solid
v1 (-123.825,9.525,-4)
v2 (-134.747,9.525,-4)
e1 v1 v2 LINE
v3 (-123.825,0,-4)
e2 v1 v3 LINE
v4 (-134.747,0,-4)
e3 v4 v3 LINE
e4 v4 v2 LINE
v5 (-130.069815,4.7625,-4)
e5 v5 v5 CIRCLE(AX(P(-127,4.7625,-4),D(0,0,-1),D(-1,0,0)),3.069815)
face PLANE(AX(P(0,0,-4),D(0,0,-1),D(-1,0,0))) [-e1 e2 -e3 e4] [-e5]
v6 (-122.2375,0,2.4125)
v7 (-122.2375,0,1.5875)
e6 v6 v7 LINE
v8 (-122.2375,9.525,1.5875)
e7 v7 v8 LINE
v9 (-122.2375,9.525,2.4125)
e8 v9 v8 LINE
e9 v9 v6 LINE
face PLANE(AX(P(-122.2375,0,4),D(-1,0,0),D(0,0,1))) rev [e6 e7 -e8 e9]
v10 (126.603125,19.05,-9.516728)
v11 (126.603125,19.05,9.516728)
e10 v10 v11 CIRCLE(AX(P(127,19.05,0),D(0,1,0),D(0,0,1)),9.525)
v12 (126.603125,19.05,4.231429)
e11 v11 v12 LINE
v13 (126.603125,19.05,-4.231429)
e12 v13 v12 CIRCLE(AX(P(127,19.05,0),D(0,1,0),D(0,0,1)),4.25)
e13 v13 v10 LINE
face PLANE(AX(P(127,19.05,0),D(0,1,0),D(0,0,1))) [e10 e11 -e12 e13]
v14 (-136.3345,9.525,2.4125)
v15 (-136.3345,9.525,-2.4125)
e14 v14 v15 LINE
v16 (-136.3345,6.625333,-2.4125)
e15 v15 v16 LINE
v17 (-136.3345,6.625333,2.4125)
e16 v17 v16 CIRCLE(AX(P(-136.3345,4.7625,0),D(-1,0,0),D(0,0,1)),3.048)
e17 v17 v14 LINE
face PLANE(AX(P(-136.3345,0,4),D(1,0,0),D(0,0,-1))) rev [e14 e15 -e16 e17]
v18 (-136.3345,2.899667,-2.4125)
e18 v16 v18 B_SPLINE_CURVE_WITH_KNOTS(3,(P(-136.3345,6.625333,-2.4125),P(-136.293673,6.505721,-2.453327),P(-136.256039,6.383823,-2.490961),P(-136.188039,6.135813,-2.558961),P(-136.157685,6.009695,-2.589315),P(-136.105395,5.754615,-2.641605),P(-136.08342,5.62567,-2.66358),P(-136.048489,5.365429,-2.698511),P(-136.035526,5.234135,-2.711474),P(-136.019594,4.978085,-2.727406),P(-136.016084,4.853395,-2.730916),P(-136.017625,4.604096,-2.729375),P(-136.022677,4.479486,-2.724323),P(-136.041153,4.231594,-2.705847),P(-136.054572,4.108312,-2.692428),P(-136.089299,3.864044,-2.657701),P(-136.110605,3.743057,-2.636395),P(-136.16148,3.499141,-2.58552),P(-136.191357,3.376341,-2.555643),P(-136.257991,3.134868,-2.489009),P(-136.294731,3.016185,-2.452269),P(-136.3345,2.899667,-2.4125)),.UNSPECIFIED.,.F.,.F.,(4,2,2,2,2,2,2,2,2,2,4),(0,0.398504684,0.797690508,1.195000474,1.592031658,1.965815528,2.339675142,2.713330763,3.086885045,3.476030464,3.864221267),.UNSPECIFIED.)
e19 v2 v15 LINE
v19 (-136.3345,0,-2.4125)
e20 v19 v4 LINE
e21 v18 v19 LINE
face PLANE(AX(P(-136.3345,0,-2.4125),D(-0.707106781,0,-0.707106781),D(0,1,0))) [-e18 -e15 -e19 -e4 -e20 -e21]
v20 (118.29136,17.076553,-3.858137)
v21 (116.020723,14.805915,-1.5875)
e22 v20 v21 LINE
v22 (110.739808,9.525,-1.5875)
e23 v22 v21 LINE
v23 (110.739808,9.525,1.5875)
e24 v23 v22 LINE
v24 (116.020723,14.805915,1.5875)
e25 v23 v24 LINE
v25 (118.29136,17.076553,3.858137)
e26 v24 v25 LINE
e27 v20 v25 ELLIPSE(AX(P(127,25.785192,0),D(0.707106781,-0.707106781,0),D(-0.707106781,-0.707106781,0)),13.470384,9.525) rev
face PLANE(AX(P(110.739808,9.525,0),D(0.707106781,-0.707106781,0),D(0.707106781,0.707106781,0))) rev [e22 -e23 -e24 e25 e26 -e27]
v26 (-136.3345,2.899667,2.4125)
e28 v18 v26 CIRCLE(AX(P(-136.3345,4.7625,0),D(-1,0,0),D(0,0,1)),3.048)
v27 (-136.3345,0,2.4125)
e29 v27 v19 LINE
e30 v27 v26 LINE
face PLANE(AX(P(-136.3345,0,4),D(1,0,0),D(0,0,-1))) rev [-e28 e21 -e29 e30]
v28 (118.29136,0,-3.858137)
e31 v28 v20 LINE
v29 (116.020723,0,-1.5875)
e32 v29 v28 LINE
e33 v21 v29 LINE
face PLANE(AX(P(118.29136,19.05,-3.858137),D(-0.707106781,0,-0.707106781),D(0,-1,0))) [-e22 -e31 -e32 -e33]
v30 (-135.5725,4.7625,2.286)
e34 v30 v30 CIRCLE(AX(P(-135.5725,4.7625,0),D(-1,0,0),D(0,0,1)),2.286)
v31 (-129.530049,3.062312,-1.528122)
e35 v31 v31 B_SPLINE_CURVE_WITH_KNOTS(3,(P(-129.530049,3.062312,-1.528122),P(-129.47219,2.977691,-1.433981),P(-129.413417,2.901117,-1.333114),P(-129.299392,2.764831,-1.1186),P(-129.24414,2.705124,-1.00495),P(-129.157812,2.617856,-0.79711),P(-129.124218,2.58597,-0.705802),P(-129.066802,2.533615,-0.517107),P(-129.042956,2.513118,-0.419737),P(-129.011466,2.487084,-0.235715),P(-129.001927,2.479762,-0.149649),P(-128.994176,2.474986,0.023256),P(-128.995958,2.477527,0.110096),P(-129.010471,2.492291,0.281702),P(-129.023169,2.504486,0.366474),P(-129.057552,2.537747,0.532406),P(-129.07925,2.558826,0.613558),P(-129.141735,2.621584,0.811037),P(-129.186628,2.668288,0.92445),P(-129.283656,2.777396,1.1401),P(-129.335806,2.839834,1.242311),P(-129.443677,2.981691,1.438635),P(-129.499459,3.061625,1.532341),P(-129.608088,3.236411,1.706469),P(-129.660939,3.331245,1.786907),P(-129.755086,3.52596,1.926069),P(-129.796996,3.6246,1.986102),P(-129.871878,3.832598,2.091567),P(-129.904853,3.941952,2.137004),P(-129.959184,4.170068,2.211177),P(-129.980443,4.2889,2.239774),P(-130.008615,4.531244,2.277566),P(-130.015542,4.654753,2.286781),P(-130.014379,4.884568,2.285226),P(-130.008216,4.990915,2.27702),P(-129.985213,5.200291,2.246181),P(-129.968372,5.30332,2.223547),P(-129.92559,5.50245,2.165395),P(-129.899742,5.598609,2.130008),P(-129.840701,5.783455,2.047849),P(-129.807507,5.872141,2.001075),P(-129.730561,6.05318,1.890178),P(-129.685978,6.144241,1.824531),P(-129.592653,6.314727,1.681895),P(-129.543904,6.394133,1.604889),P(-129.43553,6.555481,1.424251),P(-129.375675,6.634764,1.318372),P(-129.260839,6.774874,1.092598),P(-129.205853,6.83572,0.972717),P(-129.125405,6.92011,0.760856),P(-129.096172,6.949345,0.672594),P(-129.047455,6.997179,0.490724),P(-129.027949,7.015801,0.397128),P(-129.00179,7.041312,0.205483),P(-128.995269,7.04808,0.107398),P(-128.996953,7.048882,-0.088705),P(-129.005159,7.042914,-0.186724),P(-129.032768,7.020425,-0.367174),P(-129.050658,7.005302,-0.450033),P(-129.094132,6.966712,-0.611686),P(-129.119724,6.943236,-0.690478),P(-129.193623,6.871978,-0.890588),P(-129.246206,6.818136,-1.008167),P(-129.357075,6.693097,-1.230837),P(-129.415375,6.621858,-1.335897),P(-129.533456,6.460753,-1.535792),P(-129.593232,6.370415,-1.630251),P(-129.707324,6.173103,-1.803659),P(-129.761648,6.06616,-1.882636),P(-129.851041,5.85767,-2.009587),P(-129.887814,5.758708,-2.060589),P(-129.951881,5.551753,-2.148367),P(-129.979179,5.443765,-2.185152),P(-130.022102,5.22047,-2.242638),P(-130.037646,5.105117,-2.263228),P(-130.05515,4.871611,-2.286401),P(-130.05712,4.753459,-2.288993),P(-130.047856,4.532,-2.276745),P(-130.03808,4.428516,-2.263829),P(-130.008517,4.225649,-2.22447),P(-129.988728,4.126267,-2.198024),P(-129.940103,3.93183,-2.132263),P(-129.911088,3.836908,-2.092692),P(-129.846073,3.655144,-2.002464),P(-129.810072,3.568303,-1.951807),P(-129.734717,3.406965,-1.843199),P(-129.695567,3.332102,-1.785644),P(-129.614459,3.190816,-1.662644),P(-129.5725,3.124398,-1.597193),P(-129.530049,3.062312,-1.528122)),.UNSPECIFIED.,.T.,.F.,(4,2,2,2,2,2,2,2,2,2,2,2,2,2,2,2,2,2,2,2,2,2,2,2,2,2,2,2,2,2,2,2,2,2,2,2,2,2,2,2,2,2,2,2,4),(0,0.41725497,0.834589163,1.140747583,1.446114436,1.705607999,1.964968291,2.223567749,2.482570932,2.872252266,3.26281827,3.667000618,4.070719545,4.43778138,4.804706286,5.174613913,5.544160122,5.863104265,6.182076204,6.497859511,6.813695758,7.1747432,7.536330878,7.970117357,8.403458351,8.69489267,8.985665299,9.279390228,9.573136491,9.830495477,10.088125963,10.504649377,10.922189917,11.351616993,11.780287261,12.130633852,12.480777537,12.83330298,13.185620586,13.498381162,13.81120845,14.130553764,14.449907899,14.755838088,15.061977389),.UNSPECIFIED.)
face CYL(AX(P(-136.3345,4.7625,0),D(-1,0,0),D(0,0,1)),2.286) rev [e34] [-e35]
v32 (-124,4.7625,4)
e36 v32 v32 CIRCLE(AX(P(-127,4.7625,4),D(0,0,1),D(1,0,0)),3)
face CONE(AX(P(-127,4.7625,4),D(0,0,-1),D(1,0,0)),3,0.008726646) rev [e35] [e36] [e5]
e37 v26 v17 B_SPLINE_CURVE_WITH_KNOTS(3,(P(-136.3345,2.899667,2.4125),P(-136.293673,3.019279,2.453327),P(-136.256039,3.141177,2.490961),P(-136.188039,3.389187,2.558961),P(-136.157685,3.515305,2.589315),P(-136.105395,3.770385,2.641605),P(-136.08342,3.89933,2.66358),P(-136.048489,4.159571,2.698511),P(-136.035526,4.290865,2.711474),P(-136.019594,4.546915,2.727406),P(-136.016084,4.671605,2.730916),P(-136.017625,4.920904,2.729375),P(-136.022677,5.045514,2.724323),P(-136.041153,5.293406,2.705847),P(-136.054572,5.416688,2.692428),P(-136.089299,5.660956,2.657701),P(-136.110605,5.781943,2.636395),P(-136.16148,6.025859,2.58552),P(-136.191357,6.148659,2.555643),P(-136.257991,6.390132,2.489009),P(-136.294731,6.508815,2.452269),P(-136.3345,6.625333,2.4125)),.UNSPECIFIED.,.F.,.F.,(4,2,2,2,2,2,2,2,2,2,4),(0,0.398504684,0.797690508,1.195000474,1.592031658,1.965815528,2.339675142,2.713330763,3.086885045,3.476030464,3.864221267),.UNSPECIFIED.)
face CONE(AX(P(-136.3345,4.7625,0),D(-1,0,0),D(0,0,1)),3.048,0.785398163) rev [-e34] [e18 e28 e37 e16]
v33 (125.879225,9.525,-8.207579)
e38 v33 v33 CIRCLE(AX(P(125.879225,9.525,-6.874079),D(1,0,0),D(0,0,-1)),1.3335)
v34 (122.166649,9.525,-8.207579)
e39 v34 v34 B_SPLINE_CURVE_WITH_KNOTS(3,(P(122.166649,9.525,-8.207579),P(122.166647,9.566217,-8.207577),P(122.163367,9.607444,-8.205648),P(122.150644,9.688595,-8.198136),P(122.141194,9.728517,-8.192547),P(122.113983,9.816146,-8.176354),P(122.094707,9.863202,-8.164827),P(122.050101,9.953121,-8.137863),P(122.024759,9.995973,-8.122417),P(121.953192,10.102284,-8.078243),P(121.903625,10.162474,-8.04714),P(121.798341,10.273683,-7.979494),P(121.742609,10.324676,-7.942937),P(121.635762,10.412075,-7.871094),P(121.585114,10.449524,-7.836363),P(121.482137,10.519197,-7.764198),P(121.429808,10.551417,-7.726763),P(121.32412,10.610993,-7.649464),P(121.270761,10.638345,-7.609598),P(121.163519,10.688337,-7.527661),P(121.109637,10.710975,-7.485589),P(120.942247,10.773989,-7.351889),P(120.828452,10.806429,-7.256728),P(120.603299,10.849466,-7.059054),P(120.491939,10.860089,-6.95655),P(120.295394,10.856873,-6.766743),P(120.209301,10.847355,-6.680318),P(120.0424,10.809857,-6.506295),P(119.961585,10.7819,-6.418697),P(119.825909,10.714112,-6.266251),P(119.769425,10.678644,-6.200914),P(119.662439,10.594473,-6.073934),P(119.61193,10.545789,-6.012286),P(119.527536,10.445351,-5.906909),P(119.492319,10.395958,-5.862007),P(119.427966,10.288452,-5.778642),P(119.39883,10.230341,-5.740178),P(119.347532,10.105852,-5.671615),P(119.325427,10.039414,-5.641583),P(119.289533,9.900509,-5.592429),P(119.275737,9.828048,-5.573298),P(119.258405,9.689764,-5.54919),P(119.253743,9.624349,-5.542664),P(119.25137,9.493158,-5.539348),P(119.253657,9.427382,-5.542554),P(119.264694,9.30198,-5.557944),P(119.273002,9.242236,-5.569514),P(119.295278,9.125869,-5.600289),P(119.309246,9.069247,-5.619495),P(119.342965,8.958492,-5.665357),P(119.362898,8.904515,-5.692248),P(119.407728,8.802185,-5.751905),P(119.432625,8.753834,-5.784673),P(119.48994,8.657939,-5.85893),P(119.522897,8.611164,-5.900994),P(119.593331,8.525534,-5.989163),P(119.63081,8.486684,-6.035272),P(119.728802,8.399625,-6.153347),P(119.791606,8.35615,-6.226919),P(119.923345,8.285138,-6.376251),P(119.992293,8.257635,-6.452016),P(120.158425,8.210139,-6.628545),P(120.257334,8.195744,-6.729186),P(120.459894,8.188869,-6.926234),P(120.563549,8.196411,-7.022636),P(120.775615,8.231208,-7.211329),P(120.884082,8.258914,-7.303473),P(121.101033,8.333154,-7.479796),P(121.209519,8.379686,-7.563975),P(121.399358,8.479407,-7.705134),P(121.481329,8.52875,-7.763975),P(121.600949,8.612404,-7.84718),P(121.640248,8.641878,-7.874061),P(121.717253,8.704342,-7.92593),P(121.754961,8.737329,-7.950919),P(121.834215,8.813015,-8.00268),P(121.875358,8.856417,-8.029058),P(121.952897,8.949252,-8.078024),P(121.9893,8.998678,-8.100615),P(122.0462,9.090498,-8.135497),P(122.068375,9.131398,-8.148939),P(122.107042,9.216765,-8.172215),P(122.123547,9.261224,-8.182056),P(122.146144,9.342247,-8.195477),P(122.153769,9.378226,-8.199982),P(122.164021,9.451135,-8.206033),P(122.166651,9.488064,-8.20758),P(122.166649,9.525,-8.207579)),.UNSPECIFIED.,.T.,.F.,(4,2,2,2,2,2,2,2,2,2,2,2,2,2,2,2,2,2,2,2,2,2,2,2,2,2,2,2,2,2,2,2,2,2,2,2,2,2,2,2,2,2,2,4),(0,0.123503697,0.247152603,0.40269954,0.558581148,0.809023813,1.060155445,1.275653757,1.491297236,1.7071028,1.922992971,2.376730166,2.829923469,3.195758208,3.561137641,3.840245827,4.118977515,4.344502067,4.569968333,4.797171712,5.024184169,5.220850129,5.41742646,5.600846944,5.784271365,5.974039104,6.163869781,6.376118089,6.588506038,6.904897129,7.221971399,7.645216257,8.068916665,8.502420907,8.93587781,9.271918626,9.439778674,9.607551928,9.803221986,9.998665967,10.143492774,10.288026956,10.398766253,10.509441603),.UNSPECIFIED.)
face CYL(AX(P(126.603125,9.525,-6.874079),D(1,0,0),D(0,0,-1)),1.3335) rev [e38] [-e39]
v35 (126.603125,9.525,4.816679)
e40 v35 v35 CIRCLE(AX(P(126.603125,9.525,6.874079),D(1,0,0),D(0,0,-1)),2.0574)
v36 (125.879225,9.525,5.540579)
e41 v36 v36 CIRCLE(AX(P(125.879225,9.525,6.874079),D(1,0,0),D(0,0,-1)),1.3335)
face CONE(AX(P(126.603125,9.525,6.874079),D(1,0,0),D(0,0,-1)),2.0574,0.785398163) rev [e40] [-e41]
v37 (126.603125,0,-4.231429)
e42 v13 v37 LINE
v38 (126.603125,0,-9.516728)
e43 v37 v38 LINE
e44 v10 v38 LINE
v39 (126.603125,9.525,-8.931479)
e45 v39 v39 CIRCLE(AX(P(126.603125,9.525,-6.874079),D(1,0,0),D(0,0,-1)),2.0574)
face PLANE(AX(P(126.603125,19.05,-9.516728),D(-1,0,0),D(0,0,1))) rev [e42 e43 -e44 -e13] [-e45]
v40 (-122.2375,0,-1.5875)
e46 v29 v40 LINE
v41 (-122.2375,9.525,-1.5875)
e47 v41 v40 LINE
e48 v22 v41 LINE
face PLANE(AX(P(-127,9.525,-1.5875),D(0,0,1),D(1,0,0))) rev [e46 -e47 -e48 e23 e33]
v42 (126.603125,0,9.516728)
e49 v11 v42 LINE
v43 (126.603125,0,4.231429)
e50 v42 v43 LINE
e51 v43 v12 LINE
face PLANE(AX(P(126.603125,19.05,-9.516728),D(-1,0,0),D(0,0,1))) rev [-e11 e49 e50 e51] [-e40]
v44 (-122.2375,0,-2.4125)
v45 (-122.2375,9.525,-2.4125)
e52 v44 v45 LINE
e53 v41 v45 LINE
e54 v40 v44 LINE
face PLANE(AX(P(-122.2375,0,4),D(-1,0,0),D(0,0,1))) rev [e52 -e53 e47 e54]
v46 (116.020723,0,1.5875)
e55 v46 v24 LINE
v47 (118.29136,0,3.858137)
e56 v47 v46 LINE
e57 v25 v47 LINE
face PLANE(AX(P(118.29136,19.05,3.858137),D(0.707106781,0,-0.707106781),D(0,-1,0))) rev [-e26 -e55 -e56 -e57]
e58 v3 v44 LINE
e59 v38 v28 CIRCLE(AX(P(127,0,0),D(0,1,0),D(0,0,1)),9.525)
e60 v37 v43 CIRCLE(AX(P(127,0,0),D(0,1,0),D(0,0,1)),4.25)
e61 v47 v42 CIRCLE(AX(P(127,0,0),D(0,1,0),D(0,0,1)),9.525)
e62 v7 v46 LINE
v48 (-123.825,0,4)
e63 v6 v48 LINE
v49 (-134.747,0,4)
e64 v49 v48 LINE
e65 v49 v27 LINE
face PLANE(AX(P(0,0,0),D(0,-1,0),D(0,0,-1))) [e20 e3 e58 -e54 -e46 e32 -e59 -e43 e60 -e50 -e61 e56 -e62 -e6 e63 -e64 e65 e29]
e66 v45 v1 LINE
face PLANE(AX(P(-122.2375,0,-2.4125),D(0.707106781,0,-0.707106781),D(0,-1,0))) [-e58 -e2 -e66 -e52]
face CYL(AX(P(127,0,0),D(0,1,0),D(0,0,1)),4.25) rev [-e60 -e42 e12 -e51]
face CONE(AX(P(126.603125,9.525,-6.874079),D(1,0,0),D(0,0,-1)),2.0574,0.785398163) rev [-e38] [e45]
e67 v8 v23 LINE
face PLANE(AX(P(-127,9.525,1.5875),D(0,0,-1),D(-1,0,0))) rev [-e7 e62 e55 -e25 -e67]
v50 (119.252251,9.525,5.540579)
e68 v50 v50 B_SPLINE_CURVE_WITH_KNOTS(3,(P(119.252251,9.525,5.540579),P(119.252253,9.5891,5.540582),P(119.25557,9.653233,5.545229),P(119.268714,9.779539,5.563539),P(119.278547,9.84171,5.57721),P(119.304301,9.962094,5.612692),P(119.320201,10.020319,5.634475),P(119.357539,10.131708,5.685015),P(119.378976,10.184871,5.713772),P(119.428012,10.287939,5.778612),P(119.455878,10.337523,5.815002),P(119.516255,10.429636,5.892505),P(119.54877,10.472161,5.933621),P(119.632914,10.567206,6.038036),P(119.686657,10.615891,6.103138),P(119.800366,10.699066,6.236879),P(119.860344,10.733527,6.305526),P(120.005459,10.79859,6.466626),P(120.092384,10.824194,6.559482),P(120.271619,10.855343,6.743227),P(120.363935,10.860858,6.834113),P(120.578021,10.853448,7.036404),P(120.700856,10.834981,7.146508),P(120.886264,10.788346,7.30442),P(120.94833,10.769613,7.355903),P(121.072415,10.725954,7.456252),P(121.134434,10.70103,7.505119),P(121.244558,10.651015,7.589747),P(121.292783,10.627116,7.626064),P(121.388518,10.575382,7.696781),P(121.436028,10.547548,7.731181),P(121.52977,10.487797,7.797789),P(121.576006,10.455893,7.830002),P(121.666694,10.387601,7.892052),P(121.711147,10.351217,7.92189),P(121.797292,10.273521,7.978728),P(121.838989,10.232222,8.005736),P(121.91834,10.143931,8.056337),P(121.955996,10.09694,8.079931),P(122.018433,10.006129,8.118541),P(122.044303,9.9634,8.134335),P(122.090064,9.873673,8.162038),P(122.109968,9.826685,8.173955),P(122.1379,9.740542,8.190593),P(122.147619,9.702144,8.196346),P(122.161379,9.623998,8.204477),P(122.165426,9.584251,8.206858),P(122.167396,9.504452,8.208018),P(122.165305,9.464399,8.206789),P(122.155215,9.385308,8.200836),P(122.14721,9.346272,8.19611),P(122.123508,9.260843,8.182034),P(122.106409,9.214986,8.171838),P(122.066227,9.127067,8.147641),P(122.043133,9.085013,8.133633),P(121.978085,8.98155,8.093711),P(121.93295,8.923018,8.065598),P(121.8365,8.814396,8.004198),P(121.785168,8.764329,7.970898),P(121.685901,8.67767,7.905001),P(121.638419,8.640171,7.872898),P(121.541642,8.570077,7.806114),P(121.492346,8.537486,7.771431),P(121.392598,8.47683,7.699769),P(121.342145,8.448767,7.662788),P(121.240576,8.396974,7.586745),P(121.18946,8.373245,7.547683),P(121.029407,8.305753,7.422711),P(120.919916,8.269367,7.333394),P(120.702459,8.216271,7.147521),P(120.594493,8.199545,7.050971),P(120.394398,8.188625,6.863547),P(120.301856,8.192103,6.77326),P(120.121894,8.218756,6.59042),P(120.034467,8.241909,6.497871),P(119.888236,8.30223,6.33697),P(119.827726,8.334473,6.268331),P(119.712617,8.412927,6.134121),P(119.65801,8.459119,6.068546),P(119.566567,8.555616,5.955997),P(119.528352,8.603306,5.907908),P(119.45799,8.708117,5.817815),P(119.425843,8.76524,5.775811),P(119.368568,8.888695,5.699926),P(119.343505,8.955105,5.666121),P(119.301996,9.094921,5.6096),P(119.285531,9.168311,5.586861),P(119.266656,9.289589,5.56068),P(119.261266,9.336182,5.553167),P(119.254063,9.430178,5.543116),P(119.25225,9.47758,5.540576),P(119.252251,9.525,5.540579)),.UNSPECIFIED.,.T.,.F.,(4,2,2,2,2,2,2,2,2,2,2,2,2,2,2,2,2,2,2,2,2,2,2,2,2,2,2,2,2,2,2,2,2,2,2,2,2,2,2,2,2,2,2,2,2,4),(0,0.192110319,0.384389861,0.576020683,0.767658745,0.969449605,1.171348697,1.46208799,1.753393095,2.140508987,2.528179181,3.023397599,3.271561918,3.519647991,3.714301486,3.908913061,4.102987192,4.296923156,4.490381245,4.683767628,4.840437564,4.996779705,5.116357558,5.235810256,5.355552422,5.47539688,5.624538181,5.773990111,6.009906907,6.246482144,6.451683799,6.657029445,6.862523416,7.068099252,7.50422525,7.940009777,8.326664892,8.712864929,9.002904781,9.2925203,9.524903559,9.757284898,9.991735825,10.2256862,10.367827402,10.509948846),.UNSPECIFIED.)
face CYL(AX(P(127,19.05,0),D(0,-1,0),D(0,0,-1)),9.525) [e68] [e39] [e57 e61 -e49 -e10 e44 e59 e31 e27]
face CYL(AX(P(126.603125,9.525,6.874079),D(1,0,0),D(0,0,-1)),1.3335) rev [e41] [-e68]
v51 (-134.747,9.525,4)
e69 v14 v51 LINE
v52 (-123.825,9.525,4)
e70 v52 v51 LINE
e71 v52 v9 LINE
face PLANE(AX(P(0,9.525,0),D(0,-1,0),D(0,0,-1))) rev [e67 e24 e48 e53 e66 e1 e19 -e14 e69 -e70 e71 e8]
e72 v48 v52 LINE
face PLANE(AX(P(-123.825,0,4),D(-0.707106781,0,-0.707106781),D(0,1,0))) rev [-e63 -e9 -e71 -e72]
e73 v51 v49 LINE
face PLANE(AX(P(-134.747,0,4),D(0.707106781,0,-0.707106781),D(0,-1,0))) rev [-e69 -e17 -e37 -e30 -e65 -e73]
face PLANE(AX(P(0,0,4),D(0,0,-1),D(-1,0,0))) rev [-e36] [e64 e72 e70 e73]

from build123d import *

# Parameters (mm, degrees)
SKETCH1_W                        = 254
SKETCH1_H                        = 3.175
BOSS_EXTRUDE1_DEPTH              = 9.525
BOSS_EXTRUDE2_DEPTH              = 19.05
SKETCH3_R                        = 4.25
CUT_EXTRUDE1_DEPTH               = 129.772942093
SKETCH4_W                        = 9.525
SKETCH4_H                        = 9.525
BOSS_EXTRUDE3_DEPTH              = 4
SKETCH5_R                        = 3
CUT_EXTRUDE2_DEPTH               = 134.81689298
CUT_EXTRUDE2_DRAFT               = 0.5
RIB1_REACH                       = 135.472
SKETCH7_WALL_W                   = 278.469391374
SKETCH7_WALL_H                   = 3.175
MOVE_FACE1_BY                    = 4.572
F_10_24_TAPPED_HOLE1_D           = 4.572
F_10_24_TAPPED_HOLE1_DEPTH       = 9.3335
F_10_24_TAPPED_HOLE1_CSINK_D     = 6.096
F_10_24_TAPPED_HOLE1_CSINK_ANGLE = 90
F_10_24_TAPPED_HOLE1_TIP         = 1.373567375
F_4_40_TAPPED_HOLE1_D            = 2.667
F_4_40_TAPPED_HOLE1_DEPTH        = 9.129125
F_4_40_TAPPED_HOLE1_CSINK_D      = 4.1148
F_4_40_TAPPED_HOLE1_CSINK_ANGLE  = 90
F_4_40_TAPPED_HOLE1_TIP          = 0.801247635
CHAMFER1_SIZE                    = 1.5875


with BuildPart() as part:
    # Sketch1 → Boss-Extrude1 (new body)
    with BuildSketch(Plane(origin=(0, 0, 0), x_dir=(1, 0, 0), z_dir=(0, 1, 0))):
        Rectangle(SKETCH1_W, SKETCH1_H)
    extrude(amount=BOSS_EXTRUDE1_DEPTH)

    # Sketch2 → Boss-Extrude2 (add)
    with BuildSketch(Plane(origin=(0, 0, 0), x_dir=(1, 0, 0), z_dir=(0, 1, 0))):
        with BuildLine():
            Line((126.603125, 9.516728179), (126.603125, -9.516728179))
            ThreePointArc((126.603125, -9.516728179), (117.475, 0), (126.603125, 9.516728179))
        make_face()
    extrude(amount=BOSS_EXTRUDE2_DEPTH)

    # Sketch3 → Cut-Extrude1 (cut, through all)
    with BuildSketch(Plane(origin=(0, 19.05, 0), x_dir=(1, 0, 0), z_dir=(0, 1, 0))):
        with Locations((127, 0)):
            Circle(SKETCH3_R)
    extrude(amount=-CUT_EXTRUDE1_DEPTH, mode=Mode.SUBTRACT)

    # Sketch4 → Boss-Extrude3 (add, symmetric)
    with BuildSketch(Plane.XY):
        with Locations((-127, 4.7625)):
            Rectangle(SKETCH4_W, SKETCH4_H)
    extrude(amount=BOSS_EXTRUDE3_DEPTH, both=True)


with BuildPart() as cut_extrude2_tool:
    # Sketch5 → Cut-Extrude2 (with draft: the straight prism first)
    with BuildSketch(Plane.XY.offset(4)):
        with Locations((-127, 4.7625)):
            Circle(SKETCH5_R)
    extrude(amount=-CUT_EXTRUDE2_DEPTH)
    # Cut-Extrude2: the draft: its side faces are tilted about the plane it starts from
    cut_extrude2_sides = [cut_extrude2_tool.faces().sort_by_distance(p)[0] for p in [
        (-130, 4.7625, -63.40844649),
    ]]
    draft(cut_extrude2_sides, Plane.XY.offset(4), CUT_EXTRUDE2_DRAFT)


with BuildPart() as part_1:
    add(part.part)

    # Cut-Extrude2: cut by cut_extrude2_tool
    add(cut_extrude2_tool.part, mode=Mode.SUBTRACT)

    # Sketch7 wall → Rib1 (add, up to next)
    with BuildSketch(Plane(origin=(114.107403955, 12.892596045, 0), x_dir=(0.707106781187, 0.707106781187, 0), z_dir=(-0.707106781187, 0.707106781187, 0)), mode=Mode.PRIVATE) as rib1_sk1:
        Rectangle(SKETCH7_WALL_W, SKETCH7_WALL_H)
    rib1_tool1 = extrude(rib1_sk1.sketch, amount=-RIB1_REACH, mode=Mode.PRIVATE) - part_1.part
    add(rib1_tool1.solids().sort_by_distance((114.107403955, 12.892596045, 0))[0])

    # Move Face1: a face moved outward by 4.572
    extrude(part_1.faces().sort_by_distance((-131.7625, 4.7625, 0))[0], amount=MOVE_FACE1_BY, dir=(-1, 0, 0))

    # #10-24 Tapped Hole1
    with Locations(Plane.ZY.offset(136.3345)):
        with Locations((0, 4.7625)):
            CounterSinkHole(F_10_24_TAPPED_HOLE1_D / 2, F_10_24_TAPPED_HOLE1_CSINK_D / 2, depth=F_10_24_TAPPED_HOLE1_DEPTH, counter_sink_angle=F_10_24_TAPPED_HOLE1_CSINK_ANGLE)
            with Locations((0, 0, -(F_10_24_TAPPED_HOLE1_DEPTH + F_10_24_TAPPED_HOLE1_TIP / 2))):  # 118° drill point
                Cone(0, F_10_24_TAPPED_HOLE1_D / 2, F_10_24_TAPPED_HOLE1_TIP, mode=Mode.SUBTRACT)

    # #4-40 Tapped Hole1
    with Locations(Plane(origin=(126.603125, 0, 0), x_dir=(0, 0, -1), z_dir=(1, 0, 0))):
        with Locations((-6.874078522, 9.525), (6.874078522, 9.525)):
            CounterSinkHole(F_4_40_TAPPED_HOLE1_D / 2, F_4_40_TAPPED_HOLE1_CSINK_D / 2, depth=F_4_40_TAPPED_HOLE1_DEPTH, counter_sink_angle=F_4_40_TAPPED_HOLE1_CSINK_ANGLE)
            with Locations((0, 0, -(F_4_40_TAPPED_HOLE1_DEPTH + F_4_40_TAPPED_HOLE1_TIP / 2))):  # 118° drill point
                Cone(0, F_4_40_TAPPED_HOLE1_D / 2, F_4_40_TAPPED_HOLE1_TIP, mode=Mode.SUBTRACT)

    # Chamfer1
    # the kernel refuses this chamfer: 1.93751941, 1.5875 mm, written as the material it adds along each edge
    with BuildSketch(Plane(origin=(117.608223344, 0, -1.5875), x_dir=(-1, 0, 0), z_dir=(0, 1, 0))) as chamfer1_piece_1_section:
        with BuildLine():
            Line((CHAMFER1_SIZE, 0), (-0.683137079, -2.270637079))
            ThreePointArc((-0.683137079, -2.270637079), (-0.280625297, -1.189647084), (0, 0))
            Line((0, 0), (CHAMFER1_SIZE, 0))
        make_face()
    chamfer1_piece_1 = extrude(amount=22.492706814, mode=Mode.PRIVATE)
    chamfer1_piece_1 = split(chamfer1_piece_1, bisect_by=Plane(origin=(109.411515627, 8.196707717, -1.5875), z_dir=(0.7071067811865476, -0.7071067811865476, 0)), keep=Keep.TOP, mode=Mode.PRIVATE)
    add(chamfer1_piece_1)
    with BuildSketch(Plane(origin=(117.608223344, 22.492706814, 1.5875), x_dir=(-1, 0, 0), z_dir=(0, -1, 0))) as chamfer1_piece_2_section:
        with BuildLine():
            Line((CHAMFER1_SIZE, 0), (-0.683137079, -2.270637079))
            ThreePointArc((-0.683137079, -2.270637079), (-0.280625297, -1.189647084), (0, 0))
            Line((0, 0), (CHAMFER1_SIZE, 0))
        make_face()
    chamfer1_piece_2 = extrude(amount=22.492706814, mode=Mode.PRIVATE)
    chamfer1_piece_2 = split(chamfer1_piece_2, bisect_by=Plane(origin=(120.657869034, 19.443061124, 1.5875), z_dir=(0.7071067811865476, -0.7071067811865476, 0)), keep=Keep.TOP, mode=Mode.PRIVATE)
    add(chamfer1_piece_2)
    # the kernel refuses this chamfer: 1.93751941, 1.5875 mm, written as the material it takes off along each edge
    with BuildSketch(Plane(origin=(-122.2375, -4.082546743, -4), x_dir=(0, 0, 1), z_dir=(0, 1, 0)), Plane(origin=(-122.2375, -4.082546743, 4), x_dir=(-1, 0, 0), z_dir=(0, 1, 0))) as chamfer1_2_piece_1:
        Polygon((CHAMFER1_SIZE, 0), (0, -CHAMFER1_SIZE), (0, 0), align=None)
    extrude(amount=17.690093487, mode=Mode.SUBTRACT)
    with BuildSketch(Plane(origin=(-136.3345, 13.607546743, -4), x_dir=(1, 0, 0), z_dir=(0, -1, 0)), Plane(origin=(-136.3345, 13.607546743, 4), x_dir=(0, 0, -1), z_dir=(0, -1, 0))) as chamfer1_2_piece_2:
        Polygon((CHAMFER1_SIZE, 0), (0, CHAMFER1_SIZE), (0, 0), align=None)
    extrude(amount=17.690093487, mode=Mode.SUBTRACT)


solid = part_1.part
